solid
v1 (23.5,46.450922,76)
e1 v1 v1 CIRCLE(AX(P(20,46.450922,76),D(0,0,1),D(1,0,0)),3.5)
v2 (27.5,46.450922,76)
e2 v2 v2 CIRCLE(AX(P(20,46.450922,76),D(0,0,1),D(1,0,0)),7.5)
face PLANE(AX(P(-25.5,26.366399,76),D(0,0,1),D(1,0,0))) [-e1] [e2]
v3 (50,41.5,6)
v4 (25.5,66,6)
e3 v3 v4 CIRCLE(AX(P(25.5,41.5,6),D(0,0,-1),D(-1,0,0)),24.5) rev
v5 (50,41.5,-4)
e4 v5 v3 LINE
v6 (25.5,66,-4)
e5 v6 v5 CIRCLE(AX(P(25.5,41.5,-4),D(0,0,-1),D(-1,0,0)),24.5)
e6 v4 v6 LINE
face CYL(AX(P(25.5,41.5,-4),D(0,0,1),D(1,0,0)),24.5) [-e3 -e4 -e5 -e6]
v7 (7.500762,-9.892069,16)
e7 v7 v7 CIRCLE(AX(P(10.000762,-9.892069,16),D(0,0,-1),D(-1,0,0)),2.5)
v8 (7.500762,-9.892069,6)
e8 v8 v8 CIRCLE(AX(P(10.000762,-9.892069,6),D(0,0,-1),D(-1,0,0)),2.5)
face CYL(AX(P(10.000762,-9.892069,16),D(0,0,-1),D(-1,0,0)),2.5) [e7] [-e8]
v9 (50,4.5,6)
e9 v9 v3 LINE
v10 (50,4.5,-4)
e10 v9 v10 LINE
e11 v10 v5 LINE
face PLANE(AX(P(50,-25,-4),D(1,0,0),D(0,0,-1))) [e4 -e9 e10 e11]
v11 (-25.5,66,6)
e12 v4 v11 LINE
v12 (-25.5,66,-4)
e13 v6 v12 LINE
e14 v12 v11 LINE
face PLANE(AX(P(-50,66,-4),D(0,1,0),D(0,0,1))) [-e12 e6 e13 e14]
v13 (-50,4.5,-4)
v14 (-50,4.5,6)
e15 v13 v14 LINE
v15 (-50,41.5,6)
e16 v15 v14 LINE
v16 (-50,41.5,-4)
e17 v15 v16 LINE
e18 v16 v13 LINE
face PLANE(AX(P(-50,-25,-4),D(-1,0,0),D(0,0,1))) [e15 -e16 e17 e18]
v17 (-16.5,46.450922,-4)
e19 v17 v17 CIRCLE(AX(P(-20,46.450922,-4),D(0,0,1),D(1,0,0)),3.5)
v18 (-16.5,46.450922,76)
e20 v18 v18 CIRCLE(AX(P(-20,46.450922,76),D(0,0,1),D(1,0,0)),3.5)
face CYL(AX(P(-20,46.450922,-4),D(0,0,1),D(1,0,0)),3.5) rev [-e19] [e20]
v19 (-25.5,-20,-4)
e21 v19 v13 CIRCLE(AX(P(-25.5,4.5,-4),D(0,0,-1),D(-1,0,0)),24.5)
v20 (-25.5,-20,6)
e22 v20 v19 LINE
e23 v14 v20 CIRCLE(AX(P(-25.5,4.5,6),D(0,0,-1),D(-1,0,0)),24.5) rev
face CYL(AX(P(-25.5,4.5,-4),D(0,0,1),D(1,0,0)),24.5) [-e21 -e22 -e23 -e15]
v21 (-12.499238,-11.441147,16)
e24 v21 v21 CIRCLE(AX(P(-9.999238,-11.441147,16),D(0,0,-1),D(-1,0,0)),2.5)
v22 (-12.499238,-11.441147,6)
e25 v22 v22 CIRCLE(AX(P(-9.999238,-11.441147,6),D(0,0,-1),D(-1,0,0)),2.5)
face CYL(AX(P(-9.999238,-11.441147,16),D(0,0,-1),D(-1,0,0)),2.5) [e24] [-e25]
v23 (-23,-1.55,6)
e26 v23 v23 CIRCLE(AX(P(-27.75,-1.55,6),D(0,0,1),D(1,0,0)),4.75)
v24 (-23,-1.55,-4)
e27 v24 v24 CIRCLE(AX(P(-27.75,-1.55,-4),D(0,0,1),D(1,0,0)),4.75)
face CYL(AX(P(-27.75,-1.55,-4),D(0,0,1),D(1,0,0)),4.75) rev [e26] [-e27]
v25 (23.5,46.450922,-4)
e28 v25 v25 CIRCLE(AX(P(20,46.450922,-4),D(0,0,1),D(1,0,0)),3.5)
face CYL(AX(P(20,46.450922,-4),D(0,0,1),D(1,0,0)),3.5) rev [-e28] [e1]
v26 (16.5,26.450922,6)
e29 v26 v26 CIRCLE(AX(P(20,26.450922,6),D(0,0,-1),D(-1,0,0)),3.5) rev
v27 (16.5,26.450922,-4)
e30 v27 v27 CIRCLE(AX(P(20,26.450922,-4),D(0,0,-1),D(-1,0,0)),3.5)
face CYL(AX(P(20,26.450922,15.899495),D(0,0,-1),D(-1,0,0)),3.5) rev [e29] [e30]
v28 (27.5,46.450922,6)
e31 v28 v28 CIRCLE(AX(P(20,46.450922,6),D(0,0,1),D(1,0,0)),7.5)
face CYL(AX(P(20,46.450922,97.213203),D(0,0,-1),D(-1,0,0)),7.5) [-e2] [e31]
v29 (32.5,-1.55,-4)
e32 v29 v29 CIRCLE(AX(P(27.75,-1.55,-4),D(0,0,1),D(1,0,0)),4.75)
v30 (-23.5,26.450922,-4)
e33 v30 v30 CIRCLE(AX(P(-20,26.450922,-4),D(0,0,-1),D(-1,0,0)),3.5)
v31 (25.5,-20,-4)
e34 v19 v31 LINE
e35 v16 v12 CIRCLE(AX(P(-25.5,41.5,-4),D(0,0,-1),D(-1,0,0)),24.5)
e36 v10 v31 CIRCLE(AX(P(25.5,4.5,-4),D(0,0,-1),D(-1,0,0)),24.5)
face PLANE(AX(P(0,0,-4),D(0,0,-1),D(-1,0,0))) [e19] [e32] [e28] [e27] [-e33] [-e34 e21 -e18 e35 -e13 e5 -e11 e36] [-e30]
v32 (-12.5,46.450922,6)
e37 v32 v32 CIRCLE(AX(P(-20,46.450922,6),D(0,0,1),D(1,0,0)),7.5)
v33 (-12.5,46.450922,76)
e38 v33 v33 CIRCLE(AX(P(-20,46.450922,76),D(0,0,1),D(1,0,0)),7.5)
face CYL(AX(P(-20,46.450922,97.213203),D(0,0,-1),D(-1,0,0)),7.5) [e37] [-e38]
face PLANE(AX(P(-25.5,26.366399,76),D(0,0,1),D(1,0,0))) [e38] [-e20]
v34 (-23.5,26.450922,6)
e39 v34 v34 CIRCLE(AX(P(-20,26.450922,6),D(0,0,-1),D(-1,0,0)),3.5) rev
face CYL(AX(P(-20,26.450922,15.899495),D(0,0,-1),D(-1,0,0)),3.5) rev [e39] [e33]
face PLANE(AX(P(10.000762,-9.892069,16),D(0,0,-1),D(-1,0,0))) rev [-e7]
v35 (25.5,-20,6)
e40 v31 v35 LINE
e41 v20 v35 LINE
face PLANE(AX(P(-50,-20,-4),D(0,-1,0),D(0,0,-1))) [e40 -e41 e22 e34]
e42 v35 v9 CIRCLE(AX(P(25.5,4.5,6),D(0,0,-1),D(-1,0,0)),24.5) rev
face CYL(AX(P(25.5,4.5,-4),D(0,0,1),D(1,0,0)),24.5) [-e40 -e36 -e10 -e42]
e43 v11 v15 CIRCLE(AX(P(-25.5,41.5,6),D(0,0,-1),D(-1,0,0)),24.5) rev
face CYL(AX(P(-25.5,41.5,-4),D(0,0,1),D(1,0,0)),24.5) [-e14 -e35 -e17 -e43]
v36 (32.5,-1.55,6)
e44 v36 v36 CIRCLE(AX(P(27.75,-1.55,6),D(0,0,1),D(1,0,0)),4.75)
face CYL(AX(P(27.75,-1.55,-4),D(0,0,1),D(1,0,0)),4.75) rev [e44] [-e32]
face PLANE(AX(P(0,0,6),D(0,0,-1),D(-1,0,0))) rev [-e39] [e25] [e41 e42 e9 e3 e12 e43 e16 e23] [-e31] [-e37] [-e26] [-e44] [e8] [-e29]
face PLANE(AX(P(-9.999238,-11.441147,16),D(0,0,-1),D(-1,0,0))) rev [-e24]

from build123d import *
from build123d.topology import SkipClean

# Parameters (mm, degrees)
BOSS_EXTRUDE1_DEPTH      = 6
BOSS_EXTRUDE1_DEPTH_BACK = 4
SKETCH1_W                = 100
SKETCH1_H                = 50
SKETCH2_R                = 4.75
CUT_EXTRUDE1_DEPTH       = 57.789083458
MOVE_FACE2_BY            = 15
SKETCH3_W                = 100
SKETCH3_H                = 12
BOSS_EXTRUDE2_DEPTH      = 70
SKETCH4_R                = 2.5
BOSS_EXTRUDE3_DEPTH      = 20
SKETCH5_W                = 100
SKETCH5_H                = 56.133601368
BOSS_EXTRUDE4_DEPTH      = 10
CUT_EXTRUDE2_START       = -10
SKETCH6_R                = 4.75
SKETCH6_R_2              = 2.5
CUT_EXTRUDE2_DEPTH       = 10
FILLET2_R                = 24.5
FILLET3_R                = 5
CUT_EXTRUDE3_START       = -10
CUT_EXTRUDE3_DEPTH       = 10
BOSS_EXTRUDE5_START      = -10
SKETCH8_R                = 2.5
BOSS_EXTRUDE5_DEPTH      = 10
MOVE_START               = -4
MOVE_FACE3_DEPTH         = 10
SKETCH11_R               = 7.5
BOSS_EXTRUDE6_DEPTH      = 70
CUT_EXTRUDE4_START       = -70
CUT_EXTRUDE4_DEPTH       = 70
SKETCH13_R               = 3.5
CUT_EXTRUDE5_DEPTH       = 103.46950766
MOVE_START_2             = 6
MOVE_FACE4_OUTLINE_R     = 7.5
MOVE_FACE4_OUTLINE_R_2   = 3.5
MOVE_FACE4_DEPTH         = 70
MOVE_FACE4_2_OUTLINE_R   = 7.5
MOVE_FACE4_2_OUTLINE_R_2 = 3.5
MOVE_FACE4_2_DEPTH       = 80
MOVE_FACE4_3_OUTLINE_R   = 3.5
MOVE_FACE4_3_DEPTH       = 10
MOVE_FACE5_DEPTH         = 10
MOVE_FACE5_2_DEPTH       = 10
MOVE_FACE6_DEPTH         = 10
SKETCH17_R               = 3.5
CUT_EXTRUDE9_DEPTH       = 10


# Read off the part's stored shape, not the designer's step: Move Face3, Move Face4, Move Face5, Move Face6
with BuildPart() as part:
    # Sketch1 → Boss-Extrude1 (new, two sides: drawn at the far end of the back side and taken through both)
    with BuildSketch(Plane.XY.offset(-BOSS_EXTRUDE1_DEPTH_BACK)):
        Rectangle(SKETCH1_W, SKETCH1_H)
    extrude(amount=BOSS_EXTRUDE1_DEPTH + BOSS_EXTRUDE1_DEPTH_BACK)

    # Sketch2 → Cut-Extrude1 (cut, through all)
    with BuildSketch(Plane.XY.offset(6)):
        with Locations((27.75, 0)):
            Circle(SKETCH2_R)
        with Locations((-27.75, 0)):
            Circle(SKETCH2_R)
    extrude(amount=-CUT_EXTRUDE1_DEPTH, mode=Mode.SUBTRACT)

    # Move Face2: a face moved outward by 15.0
    extrude(part.faces().sort_by_distance((0, 25, 1))[0], amount=MOVE_FACE2_BY, dir=(0, 1, 0))

    # Sketch3 → Boss-Extrude2 (add)
    with BuildSketch(Plane.XY.offset(6)):
        with Locations((0, 34)):
            Rectangle(SKETCH3_W, SKETCH3_H)
    extrude(amount=BOSS_EXTRUDE2_DEPTH)

    # Sketch4 → Boss-Extrude3 (add)
    with BuildSketch(Plane(origin=(0, 0, -4), x_dir=(-1, 0, 0), z_dir=(0, 0, -1))):
        with Locations((9.999238357, -11.441146597)):
            Circle(SKETCH4_R)
        with Locations((-10.000761643, -9.892069005)):
            Circle(SKETCH4_R)
    extrude(amount=-BOSS_EXTRUDE3_DEPTH)

    # Sketch5 → Boss-Extrude4 (add)
    with BuildSketch(Plane.XY.offset(76)):
        with Locations((0, 11.933199316)):
            Rectangle(SKETCH5_W, SKETCH5_H)
    extrude(amount=BOSS_EXTRUDE4_DEPTH)

    # Sketch6 → Cut-Extrude2 (cut)
    with BuildSketch(Plane(origin=(0, 0, -4), x_dir=(-1, 0, 0), z_dir=(0, 0, -1)).offset(CUT_EXTRUDE2_START)):
        with Locations(Location((27.75, 0, 0), (0, 0, 180))):
            Circle(SKETCH6_R)
        with Locations((10.004296788, -9.901140623)):
            Circle(SKETCH6_R_2)
        with Locations((-9.995700599, -9.91136318)):
            Circle(SKETCH6_R_2)
        with Locations(Location((-27.75, 0, 0), (0, 0, 180))):
            Circle(SKETCH6_R)
    extrude(amount=CUT_EXTRUDE2_DEPTH, mode=Mode.SUBTRACT)

    # Fillet2
    # the kernel refuses this fillet: 24.5 mm, written as the material it takes off along each edge
    with BuildSketch(Plane(origin=(50, -16.133601368, 14.75), x_dir=(0, 1, 0), z_dir=(0, 0, 1)), Plane(origin=(50, -25, -65.25), x_dir=(0, 1, 0), z_dir=(0, 0, 1))) as fillet2_piece_1:
        with BuildLine():
            CenterArc((FILLET2_R, FILLET2_R), FILLET2_R, 180, 90)
            Line((0, FILLET2_R), (0, 0))
            Line((0, 0), (FILLET2_R, 0))
        make_face()
    extrude(amount=132.5, mode=Mode.SUBTRACT)
    with BuildSketch(Plane(origin=(-50, 40, 147.25), x_dir=(0, -1, 0), z_dir=(0, 0, -1)), Plane(origin=(50, 40, -65.25), x_dir=(0, -1, 0), z_dir=(0, 0, 1))) as fillet2_piece_2:
        with BuildLine():
            CenterArc((FILLET2_R, -FILLET2_R), FILLET2_R, 90, 90)
            Line((0, -FILLET2_R), (0, 0))
            Line((0, 0), (FILLET2_R, 0))
        make_face()
    extrude(amount=212.5, mode=Mode.SUBTRACT)
    with BuildSketch(Plane(origin=(-50, -16.133601368, 14.75), x_dir=(0, 1, 0), z_dir=(0, 0, 1)), Plane(origin=(-50, -25, 67.25), x_dir=(1, 0, 0), z_dir=(0, 0, -1))) as fillet2_piece_3:
        with BuildLine():
            CenterArc((FILLET2_R, -FILLET2_R), FILLET2_R, 90, 90)
            Line((0, -FILLET2_R), (0, 0))
            Line((0, 0), (FILLET2_R, 0))
        make_face()
    extrude(amount=132.5, mode=Mode.SUBTRACT)

    # Fillet3
    fillet3_edges = [part.edges().sort_by_distance(p)[0] for p in [
        (46.571307506, 28, 41),
        (-46.571307506, 28, 41),
    ]]
    fillet(fillet3_edges, radius=FILLET3_R)

    # Sketch7 → Cut-Extrude3 (cut)
    with BuildSketch(Plane.XY.offset(86).offset(CUT_EXTRUDE3_START)):
        with BuildLine():
            Line((-25.5, -16.133601368), (25.5, -16.133601368))
            ThreePointArc((25.5, -16.133601368), (42.824116139, -8.957717507), (50, 8.366398632))
            Line((50, 8.366398632), (50, 15.5))
            ThreePointArc((50, 15.5), (42.824116139, 32.824116139), (25.5, 40))
            Line((25.5, 40), (-25.5, 40))
            ThreePointArc((-25.5, 40), (-42.824116139, 32.824116139), (-50, 15.5))
            Line((-50, 15.5), (-50, 8.366398632))
            ThreePointArc((-50, 8.366398632), (-42.824116139, -8.957717507), (-25.5, -16.133601368))
        make_face()
    extrude(amount=CUT_EXTRUDE3_DEPTH, mode=Mode.SUBTRACT)

    # Sketch8 → Boss-Extrude5 (add)
    with BuildSketch(Plane(origin=(0, 0, -4), x_dir=(-1, 0, 0), z_dir=(0, 0, -1)).offset(BOSS_EXTRUDE5_START)):
        with Locations((10.004296788, -9.901140623)):
            Circle(SKETCH8_R)
        with Locations((-9.995700599, -9.91136318)):
            Circle(SKETCH8_R)
    extrude(amount=BOSS_EXTRUDE5_DEPTH)

    # Move Face3 outline → Move Face3 (cut)
    with BuildSketch(Plane.XY.offset(MOVE_START)):
        with BuildLine():
            Line((25.5, -20), (-25.5, -20))
            ThreePointArc((-25.5, -20), (-42.824116139, -12.824116139), (-50, 4.5))
            Line((-50, 4.5), (-50, -0.5))
            ThreePointArc((-50, -0.5), (-42.824116139, -17.824116139), (-25.5, -25))
            Line((-25.5, -25), (25.5, -25))
            ThreePointArc((25.5, -25), (42.824116139, -17.824116139), (50, -0.5))
            Line((50, -0.5), (50, 4.5))
            ThreePointArc((50, 4.5), (42.824116139, -12.824116139), (25.5, -20))
        make_face()
    extrude(amount=MOVE_FACE3_DEPTH, mode=Mode.SUBTRACT)

    # Sketch11 → Boss-Extrude6 (add)
    with BuildSketch(Plane.XY.offset(6)):
        with Locations((-20, 28.450922409)):
            Circle(SKETCH11_R)
        with Locations((20, 28.450922409)):
            Circle(SKETCH11_R)
    extrude(amount=BOSS_EXTRUDE6_DEPTH)

    # Sketch12 → Cut-Extrude4 (cut)
    with SkipClean():  # the faces are left unmerged after this step: merging them gives an invalid solid
        with BuildSketch(Plane.XY.offset(76).offset(CUT_EXTRUDE4_START)):
            with BuildLine():
                Line((-34.102325267, 28), (-27.486432327, 28))
                ThreePointArc((-27.486432327, 28), (-20, 35.950922409), (-12.513567673, 28))
                Line((-12.513567673, 28), (12.513567673, 28))
                ThreePointArc((12.513567673, 28), (20, 35.950922409), (27.486432327, 28))
                Line((27.486432327, 28), (34.102325267, 28))
                ThreePointArc((34.102325267, 28), (38.972432937, 31.867722966), (36.308049694, 37.487179487))
                ThreePointArc((36.308049694, 37.487179487), (31.048157467, 39.363527583), (25.5, 40))
                Line((25.5, 40), (-25.5, 40))
                ThreePointArc((-25.5, 40), (-31.048157467, 39.363527583), (-36.308049694, 37.487179487))
                ThreePointArc((-36.308049694, 37.487179487), (-38.972432937, 31.867722966), (-34.102325267, 28))
            make_face()
        extrude(amount=CUT_EXTRUDE4_DEPTH, mode=Mode.SUBTRACT)

    # Sketch13 → Cut-Extrude5 (cut, through all)
    with SkipClean():  # the faces are left unmerged after this step: merging them gives an invalid solid
        with BuildSketch(Plane.XY.offset(76)):
            with Locations((-20, 28.450922409)):
                Circle(SKETCH13_R)
            with Locations((20, 28.450922409)):
                Circle(SKETCH13_R)
        extrude(amount=-CUT_EXTRUDE5_DEPTH, mode=Mode.SUBTRACT)

    # Move Face4 outline → Move Face4 (cut)
    # profile 1 of 2: a face of its own
    with BuildSketch(Plane.XY.offset(MOVE_START_2)):
        with Locations((20, 28.450922409)):
            Circle(MOVE_FACE4_OUTLINE_R)
        with Locations((20, 28.450922409)):
            Circle(MOVE_FACE4_OUTLINE_R_2, mode=Mode.SUBTRACT)
    # profile 2 of 2: a face of its own
    with BuildSketch(Plane.XY.offset(MOVE_START_2)):
        with Locations((-20, 28.450922409)):
            Circle(MOVE_FACE4_OUTLINE_R)
        with Locations((-20, 28.450922409)):
            Circle(MOVE_FACE4_OUTLINE_R_2, mode=Mode.SUBTRACT)
    extrude(amount=MOVE_FACE4_DEPTH, mode=Mode.SUBTRACT)

    # Move Face4 2 outline → Move Face4 2 (add)
    # profile 1 of 2: a face of its own
    with BuildSketch(Plane.XY.offset(MOVE_START)):
        with Locations((20, 46.450922409)):
            Circle(MOVE_FACE4_2_OUTLINE_R)
        with Locations((20, 46.450922409)):
            Circle(MOVE_FACE4_2_OUTLINE_R_2, mode=Mode.SUBTRACT)
    # profile 2 of 2: a face of its own
    with BuildSketch(Plane.XY.offset(MOVE_START)):
        with Locations((-20, 46.450922409)):
            Circle(MOVE_FACE4_2_OUTLINE_R)
        with Locations((-20, 46.450922409)):
            Circle(MOVE_FACE4_2_OUTLINE_R_2, mode=Mode.SUBTRACT)
    extrude(amount=MOVE_FACE4_2_DEPTH)

    # Move Face4 3 outline → Move Face4 3 (add)
    with BuildSketch(Plane.XY.offset(MOVE_START)):
        with BuildLine():
            ThreePointArc((50, 33.5), (42.824116139, 50.824116139), (25.5, 58))
            Line((25.5, 58), (-25.5, 58))
            ThreePointArc((-25.5, 58), (-42.824116139, 50.824116139), (-50, 33.5))
            Line((-50, 33.5), (-50, 15.5))
            ThreePointArc((-50, 15.5), (-42.824116139, 32.824116139), (-25.5, 40))
            Line((-25.5, 40), (-23.825650281, 40))
            ThreePointArc((-23.825650281, 40), (-20, 53.950922409), (-16.174349719, 40))
            Line((-16.174349719, 40), (16.174349719, 40))
            ThreePointArc((16.174349719, 40), (20, 53.950922409), (23.825650281, 40))
            Line((23.825650281, 40), (25.5, 40))
            ThreePointArc((25.5, 40), (42.824116139, 32.824116139), (50, 15.5))
            Line((50, 15.5), (50, 33.5))
        make_face()
        with Locations((20, 28.450922409)):
            Circle(MOVE_FACE4_3_OUTLINE_R)
        with Locations((-20, 28.450922409)):
            Circle(MOVE_FACE4_3_OUTLINE_R)
    extrude(amount=MOVE_FACE4_3_DEPTH)

    # Move Face5 outline → Move Face5 (cut)
    with BuildSketch(Plane.XY.offset(MOVE_START)):
        with BuildLine():
            ThreePointArc((-32.436349859, -0.775), (-27.75, -6.3), (-23.063650141, -0.775))
            ThreePointArc((-23.063650141, -0.775), (-27.75, -4.75), (-32.436349859, -0.775))
        make_face()
        with BuildLine():
            ThreePointArc((23.063650141, -0.775), (27.75, -6.3), (32.436349859, -0.775))
            ThreePointArc((32.436349859, -0.775), (27.75, -4.75), (23.063650141, -0.775))
        make_face()
    extrude(amount=MOVE_FACE5_DEPTH, mode=Mode.SUBTRACT)

    # Move Face5 2 outline → Move Face5 2 (add)
    with BuildSketch(Plane.XY.offset(MOVE_START)):
        with BuildLine():
            ThreePointArc((-32.436349859, -0.775), (-27.75, 3.2), (-23.063650141, -0.775))
            ThreePointArc((-23.063650141, -0.775), (-27.75, 4.75), (-32.436349859, -0.775))
        make_face()
        with BuildLine():
            ThreePointArc((23.063650141, -0.775), (27.75, 3.2), (32.436349859, -0.775))
            ThreePointArc((32.436349859, -0.775), (27.75, 4.75), (23.063650141, -0.775))
        make_face()
    extrude(amount=MOVE_FACE5_2_DEPTH)

    # Move Face6 outline → Move Face6 (add)
    with BuildSketch(Plane.XY.offset(MOVE_START)):
        with BuildLine():
            ThreePointArc((50, 41.5), (42.824116139, 58.824116139), (25.5, 66))
            Line((25.5, 66), (-25.5, 66))
            ThreePointArc((-25.5, 66), (-42.824116139, 58.824116139), (-50, 41.5))
            Line((-50, 41.5), (-50, 33.5))
            ThreePointArc((-50, 33.5), (-42.824116139, 50.824116139), (-25.5, 58))
            Line((-25.5, 58), (25.5, 58))
            ThreePointArc((25.5, 58), (42.824116139, 50.824116139), (50, 33.5))
            Line((50, 33.5), (50, 41.5))
        make_face()
    extrude(amount=MOVE_FACE6_DEPTH)

    # Sketch17 → Cut-Extrude9 (cut)
    with BuildSketch(Plane(origin=(0, 0, -4), x_dir=(-1, 0, 0), z_dir=(0, 0, -1))):
        with Locations((-20, 26.450922409)):
            Circle(SKETCH17_R)
        with Locations((20, 26.450922409)):
            Circle(SKETCH17_R)
    extrude(amount=-CUT_EXTRUDE9_DEPTH, mode=Mode.SUBTRACT)


solid = part.part
